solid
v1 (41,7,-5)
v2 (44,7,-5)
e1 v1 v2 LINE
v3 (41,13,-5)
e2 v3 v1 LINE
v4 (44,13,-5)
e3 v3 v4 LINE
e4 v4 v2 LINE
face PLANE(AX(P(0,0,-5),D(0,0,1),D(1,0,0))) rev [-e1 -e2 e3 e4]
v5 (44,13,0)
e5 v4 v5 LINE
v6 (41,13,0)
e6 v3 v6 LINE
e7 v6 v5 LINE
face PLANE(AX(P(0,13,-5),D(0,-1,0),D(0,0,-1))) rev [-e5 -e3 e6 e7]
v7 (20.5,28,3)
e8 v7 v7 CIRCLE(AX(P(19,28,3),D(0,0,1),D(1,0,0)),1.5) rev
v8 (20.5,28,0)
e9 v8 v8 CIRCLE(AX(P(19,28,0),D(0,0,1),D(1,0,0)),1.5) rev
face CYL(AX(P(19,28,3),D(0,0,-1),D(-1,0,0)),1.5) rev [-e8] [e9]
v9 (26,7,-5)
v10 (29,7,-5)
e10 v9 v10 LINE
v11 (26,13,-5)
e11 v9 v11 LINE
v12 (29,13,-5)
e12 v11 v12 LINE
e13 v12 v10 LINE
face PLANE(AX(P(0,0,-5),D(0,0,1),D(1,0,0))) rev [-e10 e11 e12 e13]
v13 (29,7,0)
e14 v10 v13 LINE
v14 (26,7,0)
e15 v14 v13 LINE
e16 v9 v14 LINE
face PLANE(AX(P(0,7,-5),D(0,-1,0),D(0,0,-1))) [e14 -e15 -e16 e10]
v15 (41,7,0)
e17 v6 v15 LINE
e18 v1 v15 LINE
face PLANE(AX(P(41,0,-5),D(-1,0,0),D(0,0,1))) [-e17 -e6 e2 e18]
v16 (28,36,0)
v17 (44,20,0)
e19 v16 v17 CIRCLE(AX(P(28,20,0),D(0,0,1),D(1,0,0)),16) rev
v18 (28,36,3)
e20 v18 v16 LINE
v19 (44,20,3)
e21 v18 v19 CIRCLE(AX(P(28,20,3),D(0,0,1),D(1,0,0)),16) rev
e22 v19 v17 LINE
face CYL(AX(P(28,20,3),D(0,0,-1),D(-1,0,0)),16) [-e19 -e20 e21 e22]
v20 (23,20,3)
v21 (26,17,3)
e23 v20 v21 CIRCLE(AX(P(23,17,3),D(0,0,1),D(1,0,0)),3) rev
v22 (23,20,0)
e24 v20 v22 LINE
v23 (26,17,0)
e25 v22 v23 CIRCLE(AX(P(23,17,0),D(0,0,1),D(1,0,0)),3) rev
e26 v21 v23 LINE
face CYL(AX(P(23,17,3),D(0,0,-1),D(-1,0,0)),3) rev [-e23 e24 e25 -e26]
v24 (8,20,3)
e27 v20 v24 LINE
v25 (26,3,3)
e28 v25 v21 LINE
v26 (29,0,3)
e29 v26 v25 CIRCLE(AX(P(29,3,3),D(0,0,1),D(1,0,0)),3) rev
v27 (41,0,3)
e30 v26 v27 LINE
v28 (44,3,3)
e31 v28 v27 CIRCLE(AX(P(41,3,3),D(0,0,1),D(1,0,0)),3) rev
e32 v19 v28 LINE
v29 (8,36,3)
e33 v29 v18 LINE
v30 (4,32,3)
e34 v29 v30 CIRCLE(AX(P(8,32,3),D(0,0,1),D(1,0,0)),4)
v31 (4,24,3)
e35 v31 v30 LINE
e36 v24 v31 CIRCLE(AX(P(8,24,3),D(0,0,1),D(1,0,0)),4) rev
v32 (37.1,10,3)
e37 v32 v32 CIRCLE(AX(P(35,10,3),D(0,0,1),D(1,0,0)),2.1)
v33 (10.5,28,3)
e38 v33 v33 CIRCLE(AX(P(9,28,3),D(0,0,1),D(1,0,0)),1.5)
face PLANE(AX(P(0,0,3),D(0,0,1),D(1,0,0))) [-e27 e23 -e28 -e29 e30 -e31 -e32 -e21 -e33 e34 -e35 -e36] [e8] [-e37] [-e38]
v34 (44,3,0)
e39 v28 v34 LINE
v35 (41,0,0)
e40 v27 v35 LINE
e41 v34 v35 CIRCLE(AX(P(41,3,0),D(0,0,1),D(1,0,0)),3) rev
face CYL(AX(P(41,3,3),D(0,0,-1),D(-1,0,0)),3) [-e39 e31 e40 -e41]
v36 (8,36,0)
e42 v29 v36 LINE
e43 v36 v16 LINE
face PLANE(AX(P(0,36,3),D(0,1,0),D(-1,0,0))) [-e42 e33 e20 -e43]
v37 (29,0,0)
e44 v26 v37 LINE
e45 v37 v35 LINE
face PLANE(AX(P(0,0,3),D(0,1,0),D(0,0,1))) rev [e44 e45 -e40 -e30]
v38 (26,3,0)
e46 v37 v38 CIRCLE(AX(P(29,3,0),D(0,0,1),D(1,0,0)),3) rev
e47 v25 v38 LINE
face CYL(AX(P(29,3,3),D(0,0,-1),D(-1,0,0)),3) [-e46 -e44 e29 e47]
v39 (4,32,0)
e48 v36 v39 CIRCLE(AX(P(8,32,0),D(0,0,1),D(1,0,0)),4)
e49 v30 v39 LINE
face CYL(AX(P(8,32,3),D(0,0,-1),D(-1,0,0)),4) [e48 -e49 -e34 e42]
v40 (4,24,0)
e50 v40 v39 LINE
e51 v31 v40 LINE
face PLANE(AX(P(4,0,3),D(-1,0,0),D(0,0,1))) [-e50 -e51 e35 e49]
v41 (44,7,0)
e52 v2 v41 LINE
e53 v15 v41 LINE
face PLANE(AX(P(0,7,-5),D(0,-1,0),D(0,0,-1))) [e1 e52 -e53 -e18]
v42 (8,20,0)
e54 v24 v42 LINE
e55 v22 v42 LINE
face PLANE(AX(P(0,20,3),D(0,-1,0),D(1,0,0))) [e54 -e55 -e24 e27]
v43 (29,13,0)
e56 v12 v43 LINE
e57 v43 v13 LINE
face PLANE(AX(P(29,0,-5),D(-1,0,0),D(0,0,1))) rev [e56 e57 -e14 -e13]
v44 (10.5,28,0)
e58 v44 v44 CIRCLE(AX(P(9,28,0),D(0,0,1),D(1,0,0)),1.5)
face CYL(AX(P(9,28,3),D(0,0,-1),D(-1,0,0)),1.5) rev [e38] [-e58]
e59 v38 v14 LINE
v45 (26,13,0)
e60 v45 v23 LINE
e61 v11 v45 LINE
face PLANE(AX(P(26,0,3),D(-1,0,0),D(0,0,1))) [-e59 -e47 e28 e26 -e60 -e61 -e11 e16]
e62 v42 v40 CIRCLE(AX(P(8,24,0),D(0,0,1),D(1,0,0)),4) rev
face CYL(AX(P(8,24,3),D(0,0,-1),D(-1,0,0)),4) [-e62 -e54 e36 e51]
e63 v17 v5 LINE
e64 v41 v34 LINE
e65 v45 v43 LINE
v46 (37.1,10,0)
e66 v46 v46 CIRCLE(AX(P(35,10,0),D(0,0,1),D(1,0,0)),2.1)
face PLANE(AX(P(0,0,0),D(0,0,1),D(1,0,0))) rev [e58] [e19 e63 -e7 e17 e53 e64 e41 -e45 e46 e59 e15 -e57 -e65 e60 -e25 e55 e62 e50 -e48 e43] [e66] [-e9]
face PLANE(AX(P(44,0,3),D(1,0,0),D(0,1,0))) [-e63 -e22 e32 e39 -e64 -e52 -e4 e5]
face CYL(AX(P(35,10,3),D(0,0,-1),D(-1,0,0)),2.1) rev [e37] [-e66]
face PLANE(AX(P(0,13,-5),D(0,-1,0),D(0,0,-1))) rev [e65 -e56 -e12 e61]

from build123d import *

# Parameters (mm, degrees)
SKETCH_1_R      = 2.1
SKETCH_1_R_2    = 1.5
EXTRUDE_1_DEPTH = 3
SKETCH_1_3_W    = 3
SKETCH_1_3_H    = 6
EXTRUDE_2_DEPTH = 5


with BuildPart() as part:
    # 草图1 → 凸台-拉伸1 (new body)
    with BuildSketch(Plane.XY):
        with BuildLine():
            Line((28, 36), (8, 36))
            ThreePointArc((8, 36), (5.171572875, 34.828427125), (4, 32))
            Line((4, 32), (4, 24))
            ThreePointArc((4, 24), (5.171572875, 21.171572875), (8, 20))
            Line((8, 20), (23, 20))
            ThreePointArc((23, 20), (25.121320344, 19.121320344), (26, 17))
            Line((26, 17), (26, 3))
            ThreePointArc((26, 3), (26.878679656, 0.878679656), (29, 0))
            Line((29, 0), (41, 0))
            ThreePointArc((41, 0), (43.121320344, 0.878679656), (44, 3))
            Line((44, 3), (44, 20))
            ThreePointArc((44, 20), (39.313708499, 31.313708499), (28, 36))
        make_face()
        with Locations((35, 10)):
            Circle(SKETCH_1_R, mode=Mode.SUBTRACT)
        with Locations((9, 28)):
            Circle(SKETCH_1_R_2, mode=Mode.SUBTRACT)
        with Locations((19, 28)):
            Circle(SKETCH_1_R_2, mode=Mode.SUBTRACT)
    extrude(amount=EXTRUDE_1_DEPTH)

    # 草图1<3> → 凸台-拉伸2 (add)
    with BuildSketch(Plane.XY):
        with Locations((42.5, 10)):
            Rectangle(SKETCH_1_3_W, SKETCH_1_3_H)
        with Locations((27.5, 10)):
            Rectangle(SKETCH_1_3_W, SKETCH_1_3_H)
    extrude(amount=-EXTRUDE_2_DEPTH)


solid = part.part
